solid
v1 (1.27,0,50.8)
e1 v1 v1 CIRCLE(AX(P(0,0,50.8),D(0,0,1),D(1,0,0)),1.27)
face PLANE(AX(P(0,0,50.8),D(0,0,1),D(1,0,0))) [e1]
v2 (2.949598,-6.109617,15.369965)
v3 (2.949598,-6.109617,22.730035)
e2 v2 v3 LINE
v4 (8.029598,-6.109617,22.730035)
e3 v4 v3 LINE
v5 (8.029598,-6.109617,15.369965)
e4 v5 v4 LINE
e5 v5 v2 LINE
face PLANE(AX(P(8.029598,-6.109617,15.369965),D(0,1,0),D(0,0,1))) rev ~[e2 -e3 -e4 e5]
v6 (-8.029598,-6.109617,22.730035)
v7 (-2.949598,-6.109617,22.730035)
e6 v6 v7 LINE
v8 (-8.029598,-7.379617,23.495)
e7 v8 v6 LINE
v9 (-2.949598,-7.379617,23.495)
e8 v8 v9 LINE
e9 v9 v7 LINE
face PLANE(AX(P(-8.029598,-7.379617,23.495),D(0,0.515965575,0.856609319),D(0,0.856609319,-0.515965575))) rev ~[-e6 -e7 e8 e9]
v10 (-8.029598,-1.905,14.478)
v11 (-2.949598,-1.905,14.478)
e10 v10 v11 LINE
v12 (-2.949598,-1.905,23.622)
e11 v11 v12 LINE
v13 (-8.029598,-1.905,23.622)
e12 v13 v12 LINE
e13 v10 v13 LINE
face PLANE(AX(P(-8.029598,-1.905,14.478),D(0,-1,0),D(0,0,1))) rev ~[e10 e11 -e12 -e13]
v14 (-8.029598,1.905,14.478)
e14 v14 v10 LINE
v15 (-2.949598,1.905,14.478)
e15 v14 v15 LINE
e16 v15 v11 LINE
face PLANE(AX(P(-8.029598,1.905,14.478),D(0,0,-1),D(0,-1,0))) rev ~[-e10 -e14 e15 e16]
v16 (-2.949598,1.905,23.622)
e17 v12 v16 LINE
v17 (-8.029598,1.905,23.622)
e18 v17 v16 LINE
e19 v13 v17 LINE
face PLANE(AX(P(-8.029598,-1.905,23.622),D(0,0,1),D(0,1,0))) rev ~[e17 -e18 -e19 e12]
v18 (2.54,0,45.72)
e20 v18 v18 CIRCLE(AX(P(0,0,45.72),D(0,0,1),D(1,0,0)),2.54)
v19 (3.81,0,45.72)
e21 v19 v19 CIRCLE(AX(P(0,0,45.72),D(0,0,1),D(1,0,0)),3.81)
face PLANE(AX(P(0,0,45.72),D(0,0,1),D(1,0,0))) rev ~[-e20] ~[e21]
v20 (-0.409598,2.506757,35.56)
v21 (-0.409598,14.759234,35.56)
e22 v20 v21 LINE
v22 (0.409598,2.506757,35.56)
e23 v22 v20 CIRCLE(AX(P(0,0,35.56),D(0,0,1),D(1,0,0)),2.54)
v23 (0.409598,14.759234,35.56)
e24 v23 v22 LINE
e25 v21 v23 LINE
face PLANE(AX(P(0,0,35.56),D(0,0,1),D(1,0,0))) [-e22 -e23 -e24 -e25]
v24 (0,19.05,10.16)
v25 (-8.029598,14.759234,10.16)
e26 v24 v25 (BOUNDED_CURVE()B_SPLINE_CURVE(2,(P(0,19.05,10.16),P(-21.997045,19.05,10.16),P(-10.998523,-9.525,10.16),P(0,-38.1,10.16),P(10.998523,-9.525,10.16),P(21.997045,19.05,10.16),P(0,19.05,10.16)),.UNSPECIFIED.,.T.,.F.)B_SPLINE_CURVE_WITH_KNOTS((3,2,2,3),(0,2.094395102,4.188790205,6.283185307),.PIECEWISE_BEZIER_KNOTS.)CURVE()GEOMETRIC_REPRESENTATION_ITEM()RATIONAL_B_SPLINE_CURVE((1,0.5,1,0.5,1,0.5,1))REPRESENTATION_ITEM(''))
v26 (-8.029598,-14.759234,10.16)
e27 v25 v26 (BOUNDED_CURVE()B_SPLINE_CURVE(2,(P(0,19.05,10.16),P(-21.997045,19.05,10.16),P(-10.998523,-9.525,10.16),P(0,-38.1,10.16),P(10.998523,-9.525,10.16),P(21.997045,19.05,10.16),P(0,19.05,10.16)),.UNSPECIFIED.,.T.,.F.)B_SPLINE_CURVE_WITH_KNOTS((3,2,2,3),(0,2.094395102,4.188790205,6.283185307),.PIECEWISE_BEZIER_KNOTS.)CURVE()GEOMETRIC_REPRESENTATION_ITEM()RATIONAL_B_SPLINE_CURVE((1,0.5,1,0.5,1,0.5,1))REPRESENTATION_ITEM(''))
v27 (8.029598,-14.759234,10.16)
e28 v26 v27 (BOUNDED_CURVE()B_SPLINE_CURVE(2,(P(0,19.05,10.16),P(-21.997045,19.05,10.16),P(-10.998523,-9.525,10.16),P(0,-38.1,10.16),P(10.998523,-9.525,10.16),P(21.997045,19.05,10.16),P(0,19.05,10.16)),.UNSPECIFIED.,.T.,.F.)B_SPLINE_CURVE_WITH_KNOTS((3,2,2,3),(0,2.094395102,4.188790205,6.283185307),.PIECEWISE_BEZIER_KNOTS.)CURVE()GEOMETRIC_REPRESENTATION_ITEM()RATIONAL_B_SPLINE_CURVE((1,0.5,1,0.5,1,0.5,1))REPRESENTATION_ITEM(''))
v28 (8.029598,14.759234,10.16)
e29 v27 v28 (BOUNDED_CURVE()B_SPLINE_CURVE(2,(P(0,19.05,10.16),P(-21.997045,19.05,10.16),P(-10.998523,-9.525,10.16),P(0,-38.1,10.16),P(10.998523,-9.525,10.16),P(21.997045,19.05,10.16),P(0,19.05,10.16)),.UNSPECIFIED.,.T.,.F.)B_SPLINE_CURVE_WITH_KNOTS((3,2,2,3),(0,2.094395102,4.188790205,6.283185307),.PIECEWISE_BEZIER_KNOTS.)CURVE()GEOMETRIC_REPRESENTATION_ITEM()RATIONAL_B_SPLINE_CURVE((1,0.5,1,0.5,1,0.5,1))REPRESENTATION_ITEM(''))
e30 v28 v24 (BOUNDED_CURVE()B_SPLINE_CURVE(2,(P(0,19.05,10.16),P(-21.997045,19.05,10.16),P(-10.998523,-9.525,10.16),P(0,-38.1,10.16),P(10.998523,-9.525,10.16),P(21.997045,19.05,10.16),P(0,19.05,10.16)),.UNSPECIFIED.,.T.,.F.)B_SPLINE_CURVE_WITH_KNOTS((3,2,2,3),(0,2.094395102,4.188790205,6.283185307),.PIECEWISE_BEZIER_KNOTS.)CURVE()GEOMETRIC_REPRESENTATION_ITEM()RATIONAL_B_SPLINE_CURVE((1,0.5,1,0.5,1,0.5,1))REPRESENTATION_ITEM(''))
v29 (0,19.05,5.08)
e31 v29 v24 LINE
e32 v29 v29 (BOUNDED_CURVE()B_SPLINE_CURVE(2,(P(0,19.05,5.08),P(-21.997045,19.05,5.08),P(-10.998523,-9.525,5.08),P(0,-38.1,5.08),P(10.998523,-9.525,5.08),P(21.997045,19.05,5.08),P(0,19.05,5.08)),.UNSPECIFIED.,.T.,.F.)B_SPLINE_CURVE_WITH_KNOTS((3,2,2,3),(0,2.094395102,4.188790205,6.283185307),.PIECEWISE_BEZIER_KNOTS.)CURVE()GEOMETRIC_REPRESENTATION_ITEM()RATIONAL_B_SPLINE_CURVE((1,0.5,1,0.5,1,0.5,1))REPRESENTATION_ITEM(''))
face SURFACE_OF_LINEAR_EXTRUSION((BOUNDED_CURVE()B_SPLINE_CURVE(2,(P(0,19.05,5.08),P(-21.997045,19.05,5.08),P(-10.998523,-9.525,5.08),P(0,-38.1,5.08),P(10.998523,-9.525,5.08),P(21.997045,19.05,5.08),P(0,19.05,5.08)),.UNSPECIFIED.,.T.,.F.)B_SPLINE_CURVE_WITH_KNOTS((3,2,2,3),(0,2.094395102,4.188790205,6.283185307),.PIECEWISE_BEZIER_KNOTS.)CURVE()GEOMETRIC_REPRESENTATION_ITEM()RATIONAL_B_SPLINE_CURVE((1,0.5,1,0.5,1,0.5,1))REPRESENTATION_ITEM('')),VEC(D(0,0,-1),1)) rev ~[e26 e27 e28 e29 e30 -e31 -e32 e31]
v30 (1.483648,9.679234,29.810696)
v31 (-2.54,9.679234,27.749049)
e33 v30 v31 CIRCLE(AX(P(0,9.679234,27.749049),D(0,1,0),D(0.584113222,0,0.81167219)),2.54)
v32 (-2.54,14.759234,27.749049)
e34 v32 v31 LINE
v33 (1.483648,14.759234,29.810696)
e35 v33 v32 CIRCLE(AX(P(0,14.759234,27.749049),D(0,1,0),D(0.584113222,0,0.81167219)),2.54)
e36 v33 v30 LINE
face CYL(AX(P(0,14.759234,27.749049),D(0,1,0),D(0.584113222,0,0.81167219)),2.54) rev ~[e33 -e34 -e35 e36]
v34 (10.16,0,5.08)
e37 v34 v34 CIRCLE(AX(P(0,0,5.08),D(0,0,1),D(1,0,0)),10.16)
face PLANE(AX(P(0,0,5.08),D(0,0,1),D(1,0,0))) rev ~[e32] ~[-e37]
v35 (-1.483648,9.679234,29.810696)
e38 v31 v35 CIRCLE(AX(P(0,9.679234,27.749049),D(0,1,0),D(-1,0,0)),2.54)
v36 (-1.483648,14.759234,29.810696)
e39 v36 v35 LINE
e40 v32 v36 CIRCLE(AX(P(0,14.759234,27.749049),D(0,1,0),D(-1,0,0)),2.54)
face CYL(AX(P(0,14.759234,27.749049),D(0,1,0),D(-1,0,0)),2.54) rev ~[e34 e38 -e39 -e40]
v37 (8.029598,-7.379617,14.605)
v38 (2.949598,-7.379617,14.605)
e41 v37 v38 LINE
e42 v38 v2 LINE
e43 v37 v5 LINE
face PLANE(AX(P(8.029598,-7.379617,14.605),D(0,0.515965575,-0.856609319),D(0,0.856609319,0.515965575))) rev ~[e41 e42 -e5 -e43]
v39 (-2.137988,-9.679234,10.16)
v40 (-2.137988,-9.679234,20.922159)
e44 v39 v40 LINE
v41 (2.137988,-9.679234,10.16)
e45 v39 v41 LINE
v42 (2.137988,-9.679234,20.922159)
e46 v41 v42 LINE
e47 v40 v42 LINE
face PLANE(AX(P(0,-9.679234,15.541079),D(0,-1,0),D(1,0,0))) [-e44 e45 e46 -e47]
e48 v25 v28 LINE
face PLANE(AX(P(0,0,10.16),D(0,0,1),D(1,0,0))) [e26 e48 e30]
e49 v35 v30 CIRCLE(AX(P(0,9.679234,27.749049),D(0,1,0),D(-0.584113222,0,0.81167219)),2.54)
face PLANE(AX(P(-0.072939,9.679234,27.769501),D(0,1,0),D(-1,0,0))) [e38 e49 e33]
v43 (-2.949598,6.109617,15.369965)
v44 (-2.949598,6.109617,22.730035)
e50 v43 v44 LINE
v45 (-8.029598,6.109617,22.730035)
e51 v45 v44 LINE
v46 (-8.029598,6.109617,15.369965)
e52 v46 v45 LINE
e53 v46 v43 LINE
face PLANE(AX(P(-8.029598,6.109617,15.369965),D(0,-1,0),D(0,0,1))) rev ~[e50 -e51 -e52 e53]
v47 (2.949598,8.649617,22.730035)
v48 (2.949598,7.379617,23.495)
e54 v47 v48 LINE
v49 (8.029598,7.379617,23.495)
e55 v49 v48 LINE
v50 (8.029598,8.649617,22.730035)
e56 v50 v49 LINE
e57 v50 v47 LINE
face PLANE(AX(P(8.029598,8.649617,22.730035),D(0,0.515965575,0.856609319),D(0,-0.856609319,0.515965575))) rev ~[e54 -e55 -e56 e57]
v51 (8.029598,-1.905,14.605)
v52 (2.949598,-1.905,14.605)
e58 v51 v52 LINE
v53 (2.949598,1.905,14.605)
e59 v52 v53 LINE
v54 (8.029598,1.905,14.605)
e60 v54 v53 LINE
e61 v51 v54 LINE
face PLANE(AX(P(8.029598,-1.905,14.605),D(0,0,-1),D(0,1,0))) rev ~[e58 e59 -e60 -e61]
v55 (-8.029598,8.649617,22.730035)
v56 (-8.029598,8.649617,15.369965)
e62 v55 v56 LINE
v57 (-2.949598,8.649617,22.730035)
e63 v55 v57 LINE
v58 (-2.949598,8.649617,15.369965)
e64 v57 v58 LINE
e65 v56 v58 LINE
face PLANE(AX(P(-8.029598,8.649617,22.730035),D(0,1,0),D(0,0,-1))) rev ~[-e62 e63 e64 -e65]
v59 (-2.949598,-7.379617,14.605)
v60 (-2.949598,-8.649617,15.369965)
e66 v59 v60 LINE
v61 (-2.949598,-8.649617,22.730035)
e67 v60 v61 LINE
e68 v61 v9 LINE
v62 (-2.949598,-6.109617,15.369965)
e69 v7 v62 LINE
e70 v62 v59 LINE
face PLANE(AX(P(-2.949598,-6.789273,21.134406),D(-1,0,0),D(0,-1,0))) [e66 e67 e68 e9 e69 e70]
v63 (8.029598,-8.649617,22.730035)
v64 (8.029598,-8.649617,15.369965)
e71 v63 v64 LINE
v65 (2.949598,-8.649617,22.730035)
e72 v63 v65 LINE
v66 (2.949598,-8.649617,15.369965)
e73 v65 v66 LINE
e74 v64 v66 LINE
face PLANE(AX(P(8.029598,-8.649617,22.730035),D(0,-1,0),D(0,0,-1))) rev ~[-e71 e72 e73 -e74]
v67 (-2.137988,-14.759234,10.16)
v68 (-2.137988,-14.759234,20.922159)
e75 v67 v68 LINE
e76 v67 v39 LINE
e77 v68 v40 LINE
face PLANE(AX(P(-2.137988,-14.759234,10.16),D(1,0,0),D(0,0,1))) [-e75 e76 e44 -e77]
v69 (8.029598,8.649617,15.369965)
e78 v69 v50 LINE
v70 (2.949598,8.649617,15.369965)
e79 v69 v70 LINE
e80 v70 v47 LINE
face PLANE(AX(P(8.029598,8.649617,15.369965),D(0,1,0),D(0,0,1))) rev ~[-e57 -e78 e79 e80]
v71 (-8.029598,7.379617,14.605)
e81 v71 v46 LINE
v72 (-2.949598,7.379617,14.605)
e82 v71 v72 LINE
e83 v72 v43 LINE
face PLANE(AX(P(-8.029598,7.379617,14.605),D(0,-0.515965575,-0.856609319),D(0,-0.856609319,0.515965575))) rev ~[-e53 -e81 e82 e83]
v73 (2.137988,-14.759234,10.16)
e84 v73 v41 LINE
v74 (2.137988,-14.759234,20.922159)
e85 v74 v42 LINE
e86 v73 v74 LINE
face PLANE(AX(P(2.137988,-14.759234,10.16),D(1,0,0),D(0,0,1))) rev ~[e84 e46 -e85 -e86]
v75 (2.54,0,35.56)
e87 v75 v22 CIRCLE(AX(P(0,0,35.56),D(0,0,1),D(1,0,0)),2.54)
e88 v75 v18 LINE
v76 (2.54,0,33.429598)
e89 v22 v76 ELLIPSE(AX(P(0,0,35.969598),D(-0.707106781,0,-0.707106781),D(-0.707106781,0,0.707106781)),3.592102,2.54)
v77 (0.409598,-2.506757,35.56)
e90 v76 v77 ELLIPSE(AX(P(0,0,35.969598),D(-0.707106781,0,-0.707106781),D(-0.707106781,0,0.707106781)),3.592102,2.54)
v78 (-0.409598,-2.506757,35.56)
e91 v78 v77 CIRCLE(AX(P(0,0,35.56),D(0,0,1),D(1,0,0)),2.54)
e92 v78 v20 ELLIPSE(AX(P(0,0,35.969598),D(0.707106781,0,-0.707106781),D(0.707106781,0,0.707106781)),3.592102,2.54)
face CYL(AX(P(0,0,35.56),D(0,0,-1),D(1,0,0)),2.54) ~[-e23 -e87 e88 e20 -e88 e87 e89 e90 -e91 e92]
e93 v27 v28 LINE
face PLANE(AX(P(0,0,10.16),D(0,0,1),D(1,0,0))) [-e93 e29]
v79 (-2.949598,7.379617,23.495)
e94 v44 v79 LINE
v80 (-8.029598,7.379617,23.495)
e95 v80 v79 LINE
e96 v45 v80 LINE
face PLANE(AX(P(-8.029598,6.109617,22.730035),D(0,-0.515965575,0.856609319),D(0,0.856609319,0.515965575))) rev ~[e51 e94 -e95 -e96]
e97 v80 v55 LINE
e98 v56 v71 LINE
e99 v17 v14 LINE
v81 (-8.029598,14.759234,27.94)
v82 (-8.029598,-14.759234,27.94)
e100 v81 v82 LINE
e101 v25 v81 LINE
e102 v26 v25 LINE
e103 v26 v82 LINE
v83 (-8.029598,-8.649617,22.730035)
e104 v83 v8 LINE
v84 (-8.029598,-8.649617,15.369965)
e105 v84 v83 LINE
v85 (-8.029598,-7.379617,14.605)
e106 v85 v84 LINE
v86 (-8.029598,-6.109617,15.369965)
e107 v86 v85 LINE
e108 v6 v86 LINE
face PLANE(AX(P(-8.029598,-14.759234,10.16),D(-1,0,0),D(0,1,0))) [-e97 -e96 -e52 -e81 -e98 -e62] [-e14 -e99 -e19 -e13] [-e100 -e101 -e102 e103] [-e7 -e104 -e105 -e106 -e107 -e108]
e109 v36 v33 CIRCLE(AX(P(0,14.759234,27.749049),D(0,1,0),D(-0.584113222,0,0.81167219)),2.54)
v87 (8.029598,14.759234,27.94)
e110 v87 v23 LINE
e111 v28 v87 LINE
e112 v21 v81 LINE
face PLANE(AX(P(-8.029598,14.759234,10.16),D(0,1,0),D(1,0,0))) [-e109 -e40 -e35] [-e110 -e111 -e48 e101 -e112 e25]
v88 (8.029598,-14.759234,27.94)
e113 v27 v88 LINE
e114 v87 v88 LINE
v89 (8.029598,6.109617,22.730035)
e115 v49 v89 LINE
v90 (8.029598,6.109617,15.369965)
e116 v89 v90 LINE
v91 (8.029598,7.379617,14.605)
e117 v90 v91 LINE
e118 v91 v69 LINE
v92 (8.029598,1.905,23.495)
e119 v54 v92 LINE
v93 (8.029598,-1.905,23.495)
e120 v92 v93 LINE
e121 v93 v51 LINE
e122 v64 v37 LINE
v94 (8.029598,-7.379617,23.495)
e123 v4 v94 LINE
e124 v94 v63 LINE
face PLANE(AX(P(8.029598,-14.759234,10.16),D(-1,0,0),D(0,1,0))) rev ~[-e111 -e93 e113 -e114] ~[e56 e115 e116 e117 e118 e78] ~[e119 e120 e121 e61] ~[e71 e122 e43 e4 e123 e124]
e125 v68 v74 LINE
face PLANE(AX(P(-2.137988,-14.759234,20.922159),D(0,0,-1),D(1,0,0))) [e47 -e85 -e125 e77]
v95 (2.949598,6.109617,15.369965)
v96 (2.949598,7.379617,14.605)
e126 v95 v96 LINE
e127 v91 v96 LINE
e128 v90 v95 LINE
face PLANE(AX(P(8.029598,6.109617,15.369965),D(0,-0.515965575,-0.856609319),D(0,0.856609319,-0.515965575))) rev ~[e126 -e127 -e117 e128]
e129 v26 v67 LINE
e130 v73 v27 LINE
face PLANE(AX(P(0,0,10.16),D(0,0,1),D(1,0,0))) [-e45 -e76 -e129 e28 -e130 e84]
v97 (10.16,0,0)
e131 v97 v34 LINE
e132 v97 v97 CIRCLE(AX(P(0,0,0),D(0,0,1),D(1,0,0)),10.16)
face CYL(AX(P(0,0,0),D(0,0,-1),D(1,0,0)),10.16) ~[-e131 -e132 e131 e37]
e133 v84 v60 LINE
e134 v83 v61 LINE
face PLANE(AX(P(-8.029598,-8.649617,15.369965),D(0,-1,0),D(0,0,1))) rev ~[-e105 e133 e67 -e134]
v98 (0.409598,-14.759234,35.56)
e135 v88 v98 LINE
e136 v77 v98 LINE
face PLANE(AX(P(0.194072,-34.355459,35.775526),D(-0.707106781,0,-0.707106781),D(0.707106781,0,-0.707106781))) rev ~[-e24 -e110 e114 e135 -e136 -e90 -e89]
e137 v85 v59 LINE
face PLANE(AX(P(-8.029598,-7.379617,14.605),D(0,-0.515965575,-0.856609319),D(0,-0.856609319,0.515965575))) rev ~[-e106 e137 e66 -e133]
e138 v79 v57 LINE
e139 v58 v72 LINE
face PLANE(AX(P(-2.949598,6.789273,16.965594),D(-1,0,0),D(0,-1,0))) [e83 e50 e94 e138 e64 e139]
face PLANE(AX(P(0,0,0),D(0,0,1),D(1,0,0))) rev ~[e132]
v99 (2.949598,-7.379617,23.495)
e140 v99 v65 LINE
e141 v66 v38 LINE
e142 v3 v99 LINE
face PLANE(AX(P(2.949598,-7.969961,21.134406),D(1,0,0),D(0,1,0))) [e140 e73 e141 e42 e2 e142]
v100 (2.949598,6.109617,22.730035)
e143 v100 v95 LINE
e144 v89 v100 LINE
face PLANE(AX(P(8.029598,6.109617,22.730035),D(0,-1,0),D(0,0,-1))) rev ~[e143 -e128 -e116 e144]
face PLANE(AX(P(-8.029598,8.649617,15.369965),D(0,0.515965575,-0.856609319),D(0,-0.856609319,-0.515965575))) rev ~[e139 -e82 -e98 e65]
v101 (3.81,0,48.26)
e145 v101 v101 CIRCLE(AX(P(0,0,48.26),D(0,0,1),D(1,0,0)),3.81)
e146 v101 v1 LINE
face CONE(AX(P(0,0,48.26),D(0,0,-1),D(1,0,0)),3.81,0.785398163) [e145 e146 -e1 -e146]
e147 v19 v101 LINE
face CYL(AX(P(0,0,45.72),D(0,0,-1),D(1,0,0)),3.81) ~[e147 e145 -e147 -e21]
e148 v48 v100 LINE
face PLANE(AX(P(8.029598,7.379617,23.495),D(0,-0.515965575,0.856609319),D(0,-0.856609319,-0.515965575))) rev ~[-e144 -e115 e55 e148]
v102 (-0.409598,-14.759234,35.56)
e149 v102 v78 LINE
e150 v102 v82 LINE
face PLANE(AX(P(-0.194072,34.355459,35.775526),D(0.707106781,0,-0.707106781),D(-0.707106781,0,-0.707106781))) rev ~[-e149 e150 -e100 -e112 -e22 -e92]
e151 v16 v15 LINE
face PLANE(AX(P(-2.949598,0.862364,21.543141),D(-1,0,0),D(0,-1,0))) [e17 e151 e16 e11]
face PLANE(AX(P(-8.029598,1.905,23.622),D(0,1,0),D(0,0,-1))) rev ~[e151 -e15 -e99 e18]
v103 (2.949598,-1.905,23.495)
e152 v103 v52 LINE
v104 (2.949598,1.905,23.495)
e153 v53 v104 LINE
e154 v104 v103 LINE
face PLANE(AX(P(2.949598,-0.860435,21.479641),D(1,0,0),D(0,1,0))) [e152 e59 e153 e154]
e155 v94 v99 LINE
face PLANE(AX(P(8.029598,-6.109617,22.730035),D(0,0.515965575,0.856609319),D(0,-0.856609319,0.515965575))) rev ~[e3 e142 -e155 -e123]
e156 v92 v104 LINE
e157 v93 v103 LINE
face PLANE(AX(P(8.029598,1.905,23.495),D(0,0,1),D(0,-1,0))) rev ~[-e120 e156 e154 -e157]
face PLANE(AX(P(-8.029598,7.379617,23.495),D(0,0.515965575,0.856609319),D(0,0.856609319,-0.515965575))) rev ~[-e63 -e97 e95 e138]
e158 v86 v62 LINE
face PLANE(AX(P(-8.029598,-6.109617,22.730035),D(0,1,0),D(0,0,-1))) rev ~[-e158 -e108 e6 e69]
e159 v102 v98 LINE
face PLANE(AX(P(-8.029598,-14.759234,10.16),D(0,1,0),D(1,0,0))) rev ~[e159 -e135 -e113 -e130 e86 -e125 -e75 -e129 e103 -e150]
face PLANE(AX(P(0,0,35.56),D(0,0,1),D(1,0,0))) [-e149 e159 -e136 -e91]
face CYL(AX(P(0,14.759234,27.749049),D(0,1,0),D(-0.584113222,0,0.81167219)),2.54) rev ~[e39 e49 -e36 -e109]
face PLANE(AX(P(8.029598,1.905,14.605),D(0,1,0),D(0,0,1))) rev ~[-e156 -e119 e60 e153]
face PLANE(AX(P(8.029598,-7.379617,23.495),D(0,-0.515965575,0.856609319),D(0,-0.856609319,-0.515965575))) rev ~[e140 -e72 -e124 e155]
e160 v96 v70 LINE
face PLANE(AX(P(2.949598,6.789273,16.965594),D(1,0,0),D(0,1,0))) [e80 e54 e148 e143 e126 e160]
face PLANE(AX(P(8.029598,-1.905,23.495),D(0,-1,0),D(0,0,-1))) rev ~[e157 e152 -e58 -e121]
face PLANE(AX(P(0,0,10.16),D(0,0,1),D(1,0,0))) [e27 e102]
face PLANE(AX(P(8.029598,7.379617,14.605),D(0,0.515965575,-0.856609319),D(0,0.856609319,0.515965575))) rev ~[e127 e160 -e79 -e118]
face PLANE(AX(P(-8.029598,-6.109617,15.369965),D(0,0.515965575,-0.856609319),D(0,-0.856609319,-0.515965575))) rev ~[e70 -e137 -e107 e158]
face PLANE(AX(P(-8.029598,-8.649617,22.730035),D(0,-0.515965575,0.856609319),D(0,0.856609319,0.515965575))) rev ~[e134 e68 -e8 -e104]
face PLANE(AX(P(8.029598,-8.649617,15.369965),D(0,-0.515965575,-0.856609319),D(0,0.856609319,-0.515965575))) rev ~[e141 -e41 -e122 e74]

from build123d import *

# Parameters (mm, degrees)
F0_R          = 10.16
F1_DEPTH      = 5.08
F3_DEPTH      = 5.08
F4_W          = 16.0591960874
F4_H          = 29.5184687494
F5_DEPTH      = 25.4
F6_R          = 2.54
F7_DEPTH      = 10.16
F8_R          = 3.81
F9_DEPTH      = 5.08
F10_SIZE      = 2.54
F11_T4_DEPTH  = 68.710917486
F11_S5_R      = 2.54
F11_T6_DEPTH  = 36
F11_T10_DEPTH = 68.710917486
F11_S11_R     = 2.54
F11_T12_DEPTH = 36
F12_W         = 4.2759752832
F12_H         = 10.7621589082
F13_DEPTH     = 5.08
F15_DEPTH     = 5.08
F17_DEPTH     = 5.08
F19_DEPTH     = 5.08


# Not quite as in the source:
# - a fillet or chamfer that OpenCascade refuses, or shapes differently, is made with other operations: its cross-section is extruded or revolved along the edge and cut away or added


with BuildPart() as f1:
    # F0 (on Top) → F1 (new body)
    with BuildSketch(Plane.XY):
        Circle(F0_R)
    extrude(amount=F1_DEPTH)

    # F2 (on face) → F3 (join)
    with BuildSketch(Plane.XY.offset(5.08)):
        with BuildLine():
            add(Edge.make_bspline(
                [(0, 19.05), (-21.9970452561, 19.05), (-10.9985226281, -9.525), (0, -38.1), (10.9985226281, -9.525), (21.9970452561, 19.05), (0, 19.05)],
                knots=[0, 0, 0, 2.0943951024, 2.0943951024, 4.1887902048, 4.1887902048, 6.2831853072, 6.2831853072, 6.2831853072], degree=2, weights=[1, 0.5, 1, 0.5, 1, 0.5, 1]))
        make_face()
    extrude(amount=F3_DEPTH)

    # F4 (on face) → F5 (join)
    with BuildSketch(Plane.XY.offset(10.16)):
        Rectangle(F4_W, F4_H)
    extrude(amount=F5_DEPTH)

    # F6 (on face) → F7 (join)
    with BuildSketch(Plane.XY.offset(35.56)):
        Circle(F6_R)
    extrude(amount=F7_DEPTH)

    # F8 (on face) → F9 (join)
    with BuildSketch(Plane.XY.offset(45.72)):
        Circle(F8_R)
    extrude(amount=F9_DEPTH)

    # F10
    f10_edges = [f1.edges().sort_by_distance(p)[0] for p in [
        (-3.81, 0, 50.8),
    ]]
    chamfer(f10_edges, length=F10_SIZE)

    # F11: chamfer of 7.62 on 2 edges, made by hand


with BuildPart() as f11_tool2:
    # F11_s3 → F11_t4 (new body)
    with BuildSketch(Plane.XZ.offset(34.355458743)):
        with BuildLine():
            Line((0.1940718968, 35.7755261469), (8.2451241906, 27.7244738531))
            Line((8.2451241906, 27.7244738531), (8.3975241906, 27.7244738531))
            ThreePointArc((8.3975241906, 27.7244738531), (8.1819980437, 31.6422369265), (8.1819980437, 35.56))
            Line((8.1819980437, 35.56), (8.0295980437, 35.7124))
            ThreePointArc((8.0295980437, 35.7124), (4.1118349703, 35.7124), (0.1940718968, 35.9279261469))
            Line((0.1940718968, 35.9279261469), (0.1940718968, 35.7755261469))
        make_face()
    extrude(amount=-F11_T4_DEPTH)

    # F11_s5 → F11_t6 (cut, symmetric)
    with BuildSketch(Plane.XY.offset(31.8)):
        Circle(F11_S5_R)
    extrude(amount=F11_T6_DEPTH, both=True, mode=Mode.SUBTRACT)


with BuildPart() as f1_1:
    add(f1.part)

    # F11_t1: cut F11_tool2
    add(f11_tool2.part, mode=Mode.SUBTRACT)


with BuildPart() as f11_tool8:
    # F11_s9 → F11_t10 (new body)
    with BuildSketch(Plane.XZ.offset(-34.355458743)):
        with BuildLine():
            Line((-0.1940718968, 35.7755261469), (-8.2451241906, 27.7244738531))
            Line((-8.2451241906, 27.7244738531), (-8.3975241906, 27.7244738531))
            ThreePointArc((-8.3975241906, 27.7244738531), (-8.1819980437, 31.6422369265), (-8.1819980437, 35.56))
            Line((-8.1819980437, 35.56), (-8.0295980437, 35.7124))
            ThreePointArc((-8.0295980437, 35.7124), (-4.1118349703, 35.7124), (-0.1940718968, 35.9279261469))
            Line((-0.1940718968, 35.9279261469), (-0.1940718968, 35.7755261469))
        make_face()
    extrude(amount=F11_T10_DEPTH)

    # F11_s11 → F11_t12 (cut, symmetric)
    with BuildSketch(Plane.XY.offset(31.8)):
        Circle(F11_S11_R)
    extrude(amount=F11_T12_DEPTH, both=True, mode=Mode.SUBTRACT)


with BuildPart() as f1_2:
    add(f1_1.part)

    # F11_t7: cut F11_tool8
    add(f11_tool8.part, mode=Mode.SUBTRACT)

    # F12 (on face) → F13 (cut)
    with BuildSketch(Plane.XZ.offset(14.7592343747)):
        with Locations((0, 15.5410794541)):
            Rectangle(F12_W, F12_H)
    extrude(amount=-F13_DEPTH, mode=Mode.SUBTRACT)

    # F14 (on face) → F15 (cut)
    with BuildSketch(Plane(origin=(0, 14.7592343747, 0), x_dir=(-1, 0, 0), z_dir=(0, 1, 0))):
        with BuildLine():
            ThreePointArc((1.483647583, 29.810695909), (0, 29.332343272), (-1.483647583, 29.810695909))
            ThreePointArc((-1.483647583, 29.810695909), (-1.1582605793, 25.4885104617), (2.54, 27.749048546))
            ThreePointArc((2.54, 27.749048546), (2.2605380843, 28.9073091253), (1.483647583, 29.810695909))
        make_face()
        with BuildLine():
            ThreePointArc((1.483647583, 29.810695909), (0, 30.289048546), (-1.483647583, 29.810695909))
            ThreePointArc((-1.483647583, 29.810695909), (0, 29.332343272), (1.483647583, 29.810695909))
        make_face()
    extrude(amount=-F15_DEPTH, mode=Mode.SUBTRACT)

    # F16 (on face) → F17 (cut)
    with BuildSketch(Plane.YZ.offset(8.0295980437)):
        Polygon((-7.3796171873, 19.05), (-7.3796171873, 23.495), (-8.6496171873, 22.7300348458), (-8.6496171873, 19.05), align=None)
        Polygon((-6.1096171873, 22.7300348458), (-7.3796171873, 23.495), (-7.3796171873, 19.05), (-6.1096171873, 19.05), align=None)
        Polygon((-6.1096171873, 19.05), (-7.3796171873, 19.05), (-7.3796171873, 14.605), (-6.1096171873, 15.3699651542), align=None)
        Polygon((-7.3796171873, 14.605), (-7.3796171873, 19.05), (-8.6496171873, 19.05), (-8.6496171873, 15.3699651542), align=None)
        Polygon((0, 19.05), (0, 23.495), (-1.905, 23.495), (-1.905, 20.1974477314), align=None)
        Polygon((1.905, 23.495), (0, 23.495), (0, 19.05), (1.905, 20.1974477314), align=None)
        Polygon((-1.905, 19.05), (0, 19.05), (-1.905, 20.1974477314), align=None)
        Polygon((1.905, 20.1974477314), (0, 19.05), (1.905, 19.05), align=None)
        Polygon((1.905, 19.05), (0, 19.05), (1.905, 17.9025522686), align=None)
        Polygon((1.905, 17.9025522686), (0, 19.05), (0, 14.605), (1.905, 14.605), align=None)
        Polygon((0, 14.605), (0, 19.05), (-1.905, 17.9025522686), (-1.905, 14.605), align=None)
        Polygon((-1.905, 17.9025522686), (0, 19.05), (-1.905, 19.05), align=None)
        Polygon((7.3796171873, 14.605), (7.3796171873, 19.05), (6.1096171873, 19.05), (6.1096171873, 15.3699651542), align=None)
        Polygon((7.3796171873, 14.605), (8.6496171873, 15.3699651542), (8.6496171873, 19.05), (7.3796171873, 19.05), align=None)
        Polygon((8.6496171873, 22.7300348458), (7.3796171873, 23.495), (7.3796171873, 19.05), (8.6496171873, 19.05), align=None)
        Polygon((7.3796171873, 19.05), (7.3796171873, 23.495), (6.1096171873, 22.7300348458), (6.1096171873, 19.05), align=None)
    extrude(amount=-F17_DEPTH, mode=Mode.SUBTRACT)

    # F18 (on face) → F19 (cut)
    with BuildSketch(Plane(origin=(-8.0295980437, 0, 0), x_dir=(0, -1, 0), z_dir=(-1, 0, 0))):
        Polygon((-6.1096171873, 19.05), (-7.3796171873, 19.05), (-7.3796171873, 14.605), (-6.1096171873, 15.3699651542), align=None)
        Polygon((-7.3796171873, 19.05), (-7.3796171873, 23.495), (-8.6496171873, 22.7300348458), (-8.6496171873, 19.05), align=None)
        Polygon((0, 19.05), (0, 23.622), (-1.905, 23.622), (-1.905, 20.1974477314), align=None)
        Polygon((-1.905, 19.05), (0, 19.05), (-1.905, 20.1974477314), align=None)
        Polygon((-1.905, 17.9025522686), (0, 19.05), (-1.905, 19.05), align=None)
        Polygon((0, 14.478), (0, 19.05), (-1.905, 17.9025522686), (-1.905, 14.478), align=None)
        Polygon((1.905, 17.9025522686), (0, 19.05), (0, 14.478), (1.905, 14.478), align=None)
        Polygon((1.905, 19.05), (0, 19.05), (1.905, 17.9025522686), align=None)
        Polygon((1.905, 20.1974477314), (0, 19.05), (1.905, 19.05), align=None)
        Polygon((1.905, 23.622), (0, 23.622), (0, 19.05), (1.905, 20.1974477314), align=None)
        Polygon((7.3796171873, 19.05), (7.3796171873, 23.495), (6.1096171873, 22.7300348458), (6.1096171873, 19.05), align=None)
        Polygon((8.6496171873, 22.7300348458), (7.3796171873, 23.495), (7.3796171873, 19.05), (8.6496171873, 19.05), align=None)
        Polygon((7.3796171873, 14.605), (7.3796171873, 19.05), (6.1096171873, 19.05), (6.1096171873, 15.3699651542), align=None)
        Polygon((-6.1096171873, 22.7300348458), (-7.3796171873, 23.495), (-7.3796171873, 19.05), (-6.1096171873, 19.05), align=None)
        Polygon((-8.6496171873, 19.05), (-8.6496171873, 15.3699651542), (-7.3796171873, 14.605), (-7.3796171873, 19.05), align=None)
        Polygon((8.6496171873, 19.05), (7.3796171873, 19.05), (7.3796171873, 14.605), (8.6496171873, 15.3699651542), align=None)
    extrude(amount=-F19_DEPTH, mode=Mode.SUBTRACT)


solid = f1_2.part
